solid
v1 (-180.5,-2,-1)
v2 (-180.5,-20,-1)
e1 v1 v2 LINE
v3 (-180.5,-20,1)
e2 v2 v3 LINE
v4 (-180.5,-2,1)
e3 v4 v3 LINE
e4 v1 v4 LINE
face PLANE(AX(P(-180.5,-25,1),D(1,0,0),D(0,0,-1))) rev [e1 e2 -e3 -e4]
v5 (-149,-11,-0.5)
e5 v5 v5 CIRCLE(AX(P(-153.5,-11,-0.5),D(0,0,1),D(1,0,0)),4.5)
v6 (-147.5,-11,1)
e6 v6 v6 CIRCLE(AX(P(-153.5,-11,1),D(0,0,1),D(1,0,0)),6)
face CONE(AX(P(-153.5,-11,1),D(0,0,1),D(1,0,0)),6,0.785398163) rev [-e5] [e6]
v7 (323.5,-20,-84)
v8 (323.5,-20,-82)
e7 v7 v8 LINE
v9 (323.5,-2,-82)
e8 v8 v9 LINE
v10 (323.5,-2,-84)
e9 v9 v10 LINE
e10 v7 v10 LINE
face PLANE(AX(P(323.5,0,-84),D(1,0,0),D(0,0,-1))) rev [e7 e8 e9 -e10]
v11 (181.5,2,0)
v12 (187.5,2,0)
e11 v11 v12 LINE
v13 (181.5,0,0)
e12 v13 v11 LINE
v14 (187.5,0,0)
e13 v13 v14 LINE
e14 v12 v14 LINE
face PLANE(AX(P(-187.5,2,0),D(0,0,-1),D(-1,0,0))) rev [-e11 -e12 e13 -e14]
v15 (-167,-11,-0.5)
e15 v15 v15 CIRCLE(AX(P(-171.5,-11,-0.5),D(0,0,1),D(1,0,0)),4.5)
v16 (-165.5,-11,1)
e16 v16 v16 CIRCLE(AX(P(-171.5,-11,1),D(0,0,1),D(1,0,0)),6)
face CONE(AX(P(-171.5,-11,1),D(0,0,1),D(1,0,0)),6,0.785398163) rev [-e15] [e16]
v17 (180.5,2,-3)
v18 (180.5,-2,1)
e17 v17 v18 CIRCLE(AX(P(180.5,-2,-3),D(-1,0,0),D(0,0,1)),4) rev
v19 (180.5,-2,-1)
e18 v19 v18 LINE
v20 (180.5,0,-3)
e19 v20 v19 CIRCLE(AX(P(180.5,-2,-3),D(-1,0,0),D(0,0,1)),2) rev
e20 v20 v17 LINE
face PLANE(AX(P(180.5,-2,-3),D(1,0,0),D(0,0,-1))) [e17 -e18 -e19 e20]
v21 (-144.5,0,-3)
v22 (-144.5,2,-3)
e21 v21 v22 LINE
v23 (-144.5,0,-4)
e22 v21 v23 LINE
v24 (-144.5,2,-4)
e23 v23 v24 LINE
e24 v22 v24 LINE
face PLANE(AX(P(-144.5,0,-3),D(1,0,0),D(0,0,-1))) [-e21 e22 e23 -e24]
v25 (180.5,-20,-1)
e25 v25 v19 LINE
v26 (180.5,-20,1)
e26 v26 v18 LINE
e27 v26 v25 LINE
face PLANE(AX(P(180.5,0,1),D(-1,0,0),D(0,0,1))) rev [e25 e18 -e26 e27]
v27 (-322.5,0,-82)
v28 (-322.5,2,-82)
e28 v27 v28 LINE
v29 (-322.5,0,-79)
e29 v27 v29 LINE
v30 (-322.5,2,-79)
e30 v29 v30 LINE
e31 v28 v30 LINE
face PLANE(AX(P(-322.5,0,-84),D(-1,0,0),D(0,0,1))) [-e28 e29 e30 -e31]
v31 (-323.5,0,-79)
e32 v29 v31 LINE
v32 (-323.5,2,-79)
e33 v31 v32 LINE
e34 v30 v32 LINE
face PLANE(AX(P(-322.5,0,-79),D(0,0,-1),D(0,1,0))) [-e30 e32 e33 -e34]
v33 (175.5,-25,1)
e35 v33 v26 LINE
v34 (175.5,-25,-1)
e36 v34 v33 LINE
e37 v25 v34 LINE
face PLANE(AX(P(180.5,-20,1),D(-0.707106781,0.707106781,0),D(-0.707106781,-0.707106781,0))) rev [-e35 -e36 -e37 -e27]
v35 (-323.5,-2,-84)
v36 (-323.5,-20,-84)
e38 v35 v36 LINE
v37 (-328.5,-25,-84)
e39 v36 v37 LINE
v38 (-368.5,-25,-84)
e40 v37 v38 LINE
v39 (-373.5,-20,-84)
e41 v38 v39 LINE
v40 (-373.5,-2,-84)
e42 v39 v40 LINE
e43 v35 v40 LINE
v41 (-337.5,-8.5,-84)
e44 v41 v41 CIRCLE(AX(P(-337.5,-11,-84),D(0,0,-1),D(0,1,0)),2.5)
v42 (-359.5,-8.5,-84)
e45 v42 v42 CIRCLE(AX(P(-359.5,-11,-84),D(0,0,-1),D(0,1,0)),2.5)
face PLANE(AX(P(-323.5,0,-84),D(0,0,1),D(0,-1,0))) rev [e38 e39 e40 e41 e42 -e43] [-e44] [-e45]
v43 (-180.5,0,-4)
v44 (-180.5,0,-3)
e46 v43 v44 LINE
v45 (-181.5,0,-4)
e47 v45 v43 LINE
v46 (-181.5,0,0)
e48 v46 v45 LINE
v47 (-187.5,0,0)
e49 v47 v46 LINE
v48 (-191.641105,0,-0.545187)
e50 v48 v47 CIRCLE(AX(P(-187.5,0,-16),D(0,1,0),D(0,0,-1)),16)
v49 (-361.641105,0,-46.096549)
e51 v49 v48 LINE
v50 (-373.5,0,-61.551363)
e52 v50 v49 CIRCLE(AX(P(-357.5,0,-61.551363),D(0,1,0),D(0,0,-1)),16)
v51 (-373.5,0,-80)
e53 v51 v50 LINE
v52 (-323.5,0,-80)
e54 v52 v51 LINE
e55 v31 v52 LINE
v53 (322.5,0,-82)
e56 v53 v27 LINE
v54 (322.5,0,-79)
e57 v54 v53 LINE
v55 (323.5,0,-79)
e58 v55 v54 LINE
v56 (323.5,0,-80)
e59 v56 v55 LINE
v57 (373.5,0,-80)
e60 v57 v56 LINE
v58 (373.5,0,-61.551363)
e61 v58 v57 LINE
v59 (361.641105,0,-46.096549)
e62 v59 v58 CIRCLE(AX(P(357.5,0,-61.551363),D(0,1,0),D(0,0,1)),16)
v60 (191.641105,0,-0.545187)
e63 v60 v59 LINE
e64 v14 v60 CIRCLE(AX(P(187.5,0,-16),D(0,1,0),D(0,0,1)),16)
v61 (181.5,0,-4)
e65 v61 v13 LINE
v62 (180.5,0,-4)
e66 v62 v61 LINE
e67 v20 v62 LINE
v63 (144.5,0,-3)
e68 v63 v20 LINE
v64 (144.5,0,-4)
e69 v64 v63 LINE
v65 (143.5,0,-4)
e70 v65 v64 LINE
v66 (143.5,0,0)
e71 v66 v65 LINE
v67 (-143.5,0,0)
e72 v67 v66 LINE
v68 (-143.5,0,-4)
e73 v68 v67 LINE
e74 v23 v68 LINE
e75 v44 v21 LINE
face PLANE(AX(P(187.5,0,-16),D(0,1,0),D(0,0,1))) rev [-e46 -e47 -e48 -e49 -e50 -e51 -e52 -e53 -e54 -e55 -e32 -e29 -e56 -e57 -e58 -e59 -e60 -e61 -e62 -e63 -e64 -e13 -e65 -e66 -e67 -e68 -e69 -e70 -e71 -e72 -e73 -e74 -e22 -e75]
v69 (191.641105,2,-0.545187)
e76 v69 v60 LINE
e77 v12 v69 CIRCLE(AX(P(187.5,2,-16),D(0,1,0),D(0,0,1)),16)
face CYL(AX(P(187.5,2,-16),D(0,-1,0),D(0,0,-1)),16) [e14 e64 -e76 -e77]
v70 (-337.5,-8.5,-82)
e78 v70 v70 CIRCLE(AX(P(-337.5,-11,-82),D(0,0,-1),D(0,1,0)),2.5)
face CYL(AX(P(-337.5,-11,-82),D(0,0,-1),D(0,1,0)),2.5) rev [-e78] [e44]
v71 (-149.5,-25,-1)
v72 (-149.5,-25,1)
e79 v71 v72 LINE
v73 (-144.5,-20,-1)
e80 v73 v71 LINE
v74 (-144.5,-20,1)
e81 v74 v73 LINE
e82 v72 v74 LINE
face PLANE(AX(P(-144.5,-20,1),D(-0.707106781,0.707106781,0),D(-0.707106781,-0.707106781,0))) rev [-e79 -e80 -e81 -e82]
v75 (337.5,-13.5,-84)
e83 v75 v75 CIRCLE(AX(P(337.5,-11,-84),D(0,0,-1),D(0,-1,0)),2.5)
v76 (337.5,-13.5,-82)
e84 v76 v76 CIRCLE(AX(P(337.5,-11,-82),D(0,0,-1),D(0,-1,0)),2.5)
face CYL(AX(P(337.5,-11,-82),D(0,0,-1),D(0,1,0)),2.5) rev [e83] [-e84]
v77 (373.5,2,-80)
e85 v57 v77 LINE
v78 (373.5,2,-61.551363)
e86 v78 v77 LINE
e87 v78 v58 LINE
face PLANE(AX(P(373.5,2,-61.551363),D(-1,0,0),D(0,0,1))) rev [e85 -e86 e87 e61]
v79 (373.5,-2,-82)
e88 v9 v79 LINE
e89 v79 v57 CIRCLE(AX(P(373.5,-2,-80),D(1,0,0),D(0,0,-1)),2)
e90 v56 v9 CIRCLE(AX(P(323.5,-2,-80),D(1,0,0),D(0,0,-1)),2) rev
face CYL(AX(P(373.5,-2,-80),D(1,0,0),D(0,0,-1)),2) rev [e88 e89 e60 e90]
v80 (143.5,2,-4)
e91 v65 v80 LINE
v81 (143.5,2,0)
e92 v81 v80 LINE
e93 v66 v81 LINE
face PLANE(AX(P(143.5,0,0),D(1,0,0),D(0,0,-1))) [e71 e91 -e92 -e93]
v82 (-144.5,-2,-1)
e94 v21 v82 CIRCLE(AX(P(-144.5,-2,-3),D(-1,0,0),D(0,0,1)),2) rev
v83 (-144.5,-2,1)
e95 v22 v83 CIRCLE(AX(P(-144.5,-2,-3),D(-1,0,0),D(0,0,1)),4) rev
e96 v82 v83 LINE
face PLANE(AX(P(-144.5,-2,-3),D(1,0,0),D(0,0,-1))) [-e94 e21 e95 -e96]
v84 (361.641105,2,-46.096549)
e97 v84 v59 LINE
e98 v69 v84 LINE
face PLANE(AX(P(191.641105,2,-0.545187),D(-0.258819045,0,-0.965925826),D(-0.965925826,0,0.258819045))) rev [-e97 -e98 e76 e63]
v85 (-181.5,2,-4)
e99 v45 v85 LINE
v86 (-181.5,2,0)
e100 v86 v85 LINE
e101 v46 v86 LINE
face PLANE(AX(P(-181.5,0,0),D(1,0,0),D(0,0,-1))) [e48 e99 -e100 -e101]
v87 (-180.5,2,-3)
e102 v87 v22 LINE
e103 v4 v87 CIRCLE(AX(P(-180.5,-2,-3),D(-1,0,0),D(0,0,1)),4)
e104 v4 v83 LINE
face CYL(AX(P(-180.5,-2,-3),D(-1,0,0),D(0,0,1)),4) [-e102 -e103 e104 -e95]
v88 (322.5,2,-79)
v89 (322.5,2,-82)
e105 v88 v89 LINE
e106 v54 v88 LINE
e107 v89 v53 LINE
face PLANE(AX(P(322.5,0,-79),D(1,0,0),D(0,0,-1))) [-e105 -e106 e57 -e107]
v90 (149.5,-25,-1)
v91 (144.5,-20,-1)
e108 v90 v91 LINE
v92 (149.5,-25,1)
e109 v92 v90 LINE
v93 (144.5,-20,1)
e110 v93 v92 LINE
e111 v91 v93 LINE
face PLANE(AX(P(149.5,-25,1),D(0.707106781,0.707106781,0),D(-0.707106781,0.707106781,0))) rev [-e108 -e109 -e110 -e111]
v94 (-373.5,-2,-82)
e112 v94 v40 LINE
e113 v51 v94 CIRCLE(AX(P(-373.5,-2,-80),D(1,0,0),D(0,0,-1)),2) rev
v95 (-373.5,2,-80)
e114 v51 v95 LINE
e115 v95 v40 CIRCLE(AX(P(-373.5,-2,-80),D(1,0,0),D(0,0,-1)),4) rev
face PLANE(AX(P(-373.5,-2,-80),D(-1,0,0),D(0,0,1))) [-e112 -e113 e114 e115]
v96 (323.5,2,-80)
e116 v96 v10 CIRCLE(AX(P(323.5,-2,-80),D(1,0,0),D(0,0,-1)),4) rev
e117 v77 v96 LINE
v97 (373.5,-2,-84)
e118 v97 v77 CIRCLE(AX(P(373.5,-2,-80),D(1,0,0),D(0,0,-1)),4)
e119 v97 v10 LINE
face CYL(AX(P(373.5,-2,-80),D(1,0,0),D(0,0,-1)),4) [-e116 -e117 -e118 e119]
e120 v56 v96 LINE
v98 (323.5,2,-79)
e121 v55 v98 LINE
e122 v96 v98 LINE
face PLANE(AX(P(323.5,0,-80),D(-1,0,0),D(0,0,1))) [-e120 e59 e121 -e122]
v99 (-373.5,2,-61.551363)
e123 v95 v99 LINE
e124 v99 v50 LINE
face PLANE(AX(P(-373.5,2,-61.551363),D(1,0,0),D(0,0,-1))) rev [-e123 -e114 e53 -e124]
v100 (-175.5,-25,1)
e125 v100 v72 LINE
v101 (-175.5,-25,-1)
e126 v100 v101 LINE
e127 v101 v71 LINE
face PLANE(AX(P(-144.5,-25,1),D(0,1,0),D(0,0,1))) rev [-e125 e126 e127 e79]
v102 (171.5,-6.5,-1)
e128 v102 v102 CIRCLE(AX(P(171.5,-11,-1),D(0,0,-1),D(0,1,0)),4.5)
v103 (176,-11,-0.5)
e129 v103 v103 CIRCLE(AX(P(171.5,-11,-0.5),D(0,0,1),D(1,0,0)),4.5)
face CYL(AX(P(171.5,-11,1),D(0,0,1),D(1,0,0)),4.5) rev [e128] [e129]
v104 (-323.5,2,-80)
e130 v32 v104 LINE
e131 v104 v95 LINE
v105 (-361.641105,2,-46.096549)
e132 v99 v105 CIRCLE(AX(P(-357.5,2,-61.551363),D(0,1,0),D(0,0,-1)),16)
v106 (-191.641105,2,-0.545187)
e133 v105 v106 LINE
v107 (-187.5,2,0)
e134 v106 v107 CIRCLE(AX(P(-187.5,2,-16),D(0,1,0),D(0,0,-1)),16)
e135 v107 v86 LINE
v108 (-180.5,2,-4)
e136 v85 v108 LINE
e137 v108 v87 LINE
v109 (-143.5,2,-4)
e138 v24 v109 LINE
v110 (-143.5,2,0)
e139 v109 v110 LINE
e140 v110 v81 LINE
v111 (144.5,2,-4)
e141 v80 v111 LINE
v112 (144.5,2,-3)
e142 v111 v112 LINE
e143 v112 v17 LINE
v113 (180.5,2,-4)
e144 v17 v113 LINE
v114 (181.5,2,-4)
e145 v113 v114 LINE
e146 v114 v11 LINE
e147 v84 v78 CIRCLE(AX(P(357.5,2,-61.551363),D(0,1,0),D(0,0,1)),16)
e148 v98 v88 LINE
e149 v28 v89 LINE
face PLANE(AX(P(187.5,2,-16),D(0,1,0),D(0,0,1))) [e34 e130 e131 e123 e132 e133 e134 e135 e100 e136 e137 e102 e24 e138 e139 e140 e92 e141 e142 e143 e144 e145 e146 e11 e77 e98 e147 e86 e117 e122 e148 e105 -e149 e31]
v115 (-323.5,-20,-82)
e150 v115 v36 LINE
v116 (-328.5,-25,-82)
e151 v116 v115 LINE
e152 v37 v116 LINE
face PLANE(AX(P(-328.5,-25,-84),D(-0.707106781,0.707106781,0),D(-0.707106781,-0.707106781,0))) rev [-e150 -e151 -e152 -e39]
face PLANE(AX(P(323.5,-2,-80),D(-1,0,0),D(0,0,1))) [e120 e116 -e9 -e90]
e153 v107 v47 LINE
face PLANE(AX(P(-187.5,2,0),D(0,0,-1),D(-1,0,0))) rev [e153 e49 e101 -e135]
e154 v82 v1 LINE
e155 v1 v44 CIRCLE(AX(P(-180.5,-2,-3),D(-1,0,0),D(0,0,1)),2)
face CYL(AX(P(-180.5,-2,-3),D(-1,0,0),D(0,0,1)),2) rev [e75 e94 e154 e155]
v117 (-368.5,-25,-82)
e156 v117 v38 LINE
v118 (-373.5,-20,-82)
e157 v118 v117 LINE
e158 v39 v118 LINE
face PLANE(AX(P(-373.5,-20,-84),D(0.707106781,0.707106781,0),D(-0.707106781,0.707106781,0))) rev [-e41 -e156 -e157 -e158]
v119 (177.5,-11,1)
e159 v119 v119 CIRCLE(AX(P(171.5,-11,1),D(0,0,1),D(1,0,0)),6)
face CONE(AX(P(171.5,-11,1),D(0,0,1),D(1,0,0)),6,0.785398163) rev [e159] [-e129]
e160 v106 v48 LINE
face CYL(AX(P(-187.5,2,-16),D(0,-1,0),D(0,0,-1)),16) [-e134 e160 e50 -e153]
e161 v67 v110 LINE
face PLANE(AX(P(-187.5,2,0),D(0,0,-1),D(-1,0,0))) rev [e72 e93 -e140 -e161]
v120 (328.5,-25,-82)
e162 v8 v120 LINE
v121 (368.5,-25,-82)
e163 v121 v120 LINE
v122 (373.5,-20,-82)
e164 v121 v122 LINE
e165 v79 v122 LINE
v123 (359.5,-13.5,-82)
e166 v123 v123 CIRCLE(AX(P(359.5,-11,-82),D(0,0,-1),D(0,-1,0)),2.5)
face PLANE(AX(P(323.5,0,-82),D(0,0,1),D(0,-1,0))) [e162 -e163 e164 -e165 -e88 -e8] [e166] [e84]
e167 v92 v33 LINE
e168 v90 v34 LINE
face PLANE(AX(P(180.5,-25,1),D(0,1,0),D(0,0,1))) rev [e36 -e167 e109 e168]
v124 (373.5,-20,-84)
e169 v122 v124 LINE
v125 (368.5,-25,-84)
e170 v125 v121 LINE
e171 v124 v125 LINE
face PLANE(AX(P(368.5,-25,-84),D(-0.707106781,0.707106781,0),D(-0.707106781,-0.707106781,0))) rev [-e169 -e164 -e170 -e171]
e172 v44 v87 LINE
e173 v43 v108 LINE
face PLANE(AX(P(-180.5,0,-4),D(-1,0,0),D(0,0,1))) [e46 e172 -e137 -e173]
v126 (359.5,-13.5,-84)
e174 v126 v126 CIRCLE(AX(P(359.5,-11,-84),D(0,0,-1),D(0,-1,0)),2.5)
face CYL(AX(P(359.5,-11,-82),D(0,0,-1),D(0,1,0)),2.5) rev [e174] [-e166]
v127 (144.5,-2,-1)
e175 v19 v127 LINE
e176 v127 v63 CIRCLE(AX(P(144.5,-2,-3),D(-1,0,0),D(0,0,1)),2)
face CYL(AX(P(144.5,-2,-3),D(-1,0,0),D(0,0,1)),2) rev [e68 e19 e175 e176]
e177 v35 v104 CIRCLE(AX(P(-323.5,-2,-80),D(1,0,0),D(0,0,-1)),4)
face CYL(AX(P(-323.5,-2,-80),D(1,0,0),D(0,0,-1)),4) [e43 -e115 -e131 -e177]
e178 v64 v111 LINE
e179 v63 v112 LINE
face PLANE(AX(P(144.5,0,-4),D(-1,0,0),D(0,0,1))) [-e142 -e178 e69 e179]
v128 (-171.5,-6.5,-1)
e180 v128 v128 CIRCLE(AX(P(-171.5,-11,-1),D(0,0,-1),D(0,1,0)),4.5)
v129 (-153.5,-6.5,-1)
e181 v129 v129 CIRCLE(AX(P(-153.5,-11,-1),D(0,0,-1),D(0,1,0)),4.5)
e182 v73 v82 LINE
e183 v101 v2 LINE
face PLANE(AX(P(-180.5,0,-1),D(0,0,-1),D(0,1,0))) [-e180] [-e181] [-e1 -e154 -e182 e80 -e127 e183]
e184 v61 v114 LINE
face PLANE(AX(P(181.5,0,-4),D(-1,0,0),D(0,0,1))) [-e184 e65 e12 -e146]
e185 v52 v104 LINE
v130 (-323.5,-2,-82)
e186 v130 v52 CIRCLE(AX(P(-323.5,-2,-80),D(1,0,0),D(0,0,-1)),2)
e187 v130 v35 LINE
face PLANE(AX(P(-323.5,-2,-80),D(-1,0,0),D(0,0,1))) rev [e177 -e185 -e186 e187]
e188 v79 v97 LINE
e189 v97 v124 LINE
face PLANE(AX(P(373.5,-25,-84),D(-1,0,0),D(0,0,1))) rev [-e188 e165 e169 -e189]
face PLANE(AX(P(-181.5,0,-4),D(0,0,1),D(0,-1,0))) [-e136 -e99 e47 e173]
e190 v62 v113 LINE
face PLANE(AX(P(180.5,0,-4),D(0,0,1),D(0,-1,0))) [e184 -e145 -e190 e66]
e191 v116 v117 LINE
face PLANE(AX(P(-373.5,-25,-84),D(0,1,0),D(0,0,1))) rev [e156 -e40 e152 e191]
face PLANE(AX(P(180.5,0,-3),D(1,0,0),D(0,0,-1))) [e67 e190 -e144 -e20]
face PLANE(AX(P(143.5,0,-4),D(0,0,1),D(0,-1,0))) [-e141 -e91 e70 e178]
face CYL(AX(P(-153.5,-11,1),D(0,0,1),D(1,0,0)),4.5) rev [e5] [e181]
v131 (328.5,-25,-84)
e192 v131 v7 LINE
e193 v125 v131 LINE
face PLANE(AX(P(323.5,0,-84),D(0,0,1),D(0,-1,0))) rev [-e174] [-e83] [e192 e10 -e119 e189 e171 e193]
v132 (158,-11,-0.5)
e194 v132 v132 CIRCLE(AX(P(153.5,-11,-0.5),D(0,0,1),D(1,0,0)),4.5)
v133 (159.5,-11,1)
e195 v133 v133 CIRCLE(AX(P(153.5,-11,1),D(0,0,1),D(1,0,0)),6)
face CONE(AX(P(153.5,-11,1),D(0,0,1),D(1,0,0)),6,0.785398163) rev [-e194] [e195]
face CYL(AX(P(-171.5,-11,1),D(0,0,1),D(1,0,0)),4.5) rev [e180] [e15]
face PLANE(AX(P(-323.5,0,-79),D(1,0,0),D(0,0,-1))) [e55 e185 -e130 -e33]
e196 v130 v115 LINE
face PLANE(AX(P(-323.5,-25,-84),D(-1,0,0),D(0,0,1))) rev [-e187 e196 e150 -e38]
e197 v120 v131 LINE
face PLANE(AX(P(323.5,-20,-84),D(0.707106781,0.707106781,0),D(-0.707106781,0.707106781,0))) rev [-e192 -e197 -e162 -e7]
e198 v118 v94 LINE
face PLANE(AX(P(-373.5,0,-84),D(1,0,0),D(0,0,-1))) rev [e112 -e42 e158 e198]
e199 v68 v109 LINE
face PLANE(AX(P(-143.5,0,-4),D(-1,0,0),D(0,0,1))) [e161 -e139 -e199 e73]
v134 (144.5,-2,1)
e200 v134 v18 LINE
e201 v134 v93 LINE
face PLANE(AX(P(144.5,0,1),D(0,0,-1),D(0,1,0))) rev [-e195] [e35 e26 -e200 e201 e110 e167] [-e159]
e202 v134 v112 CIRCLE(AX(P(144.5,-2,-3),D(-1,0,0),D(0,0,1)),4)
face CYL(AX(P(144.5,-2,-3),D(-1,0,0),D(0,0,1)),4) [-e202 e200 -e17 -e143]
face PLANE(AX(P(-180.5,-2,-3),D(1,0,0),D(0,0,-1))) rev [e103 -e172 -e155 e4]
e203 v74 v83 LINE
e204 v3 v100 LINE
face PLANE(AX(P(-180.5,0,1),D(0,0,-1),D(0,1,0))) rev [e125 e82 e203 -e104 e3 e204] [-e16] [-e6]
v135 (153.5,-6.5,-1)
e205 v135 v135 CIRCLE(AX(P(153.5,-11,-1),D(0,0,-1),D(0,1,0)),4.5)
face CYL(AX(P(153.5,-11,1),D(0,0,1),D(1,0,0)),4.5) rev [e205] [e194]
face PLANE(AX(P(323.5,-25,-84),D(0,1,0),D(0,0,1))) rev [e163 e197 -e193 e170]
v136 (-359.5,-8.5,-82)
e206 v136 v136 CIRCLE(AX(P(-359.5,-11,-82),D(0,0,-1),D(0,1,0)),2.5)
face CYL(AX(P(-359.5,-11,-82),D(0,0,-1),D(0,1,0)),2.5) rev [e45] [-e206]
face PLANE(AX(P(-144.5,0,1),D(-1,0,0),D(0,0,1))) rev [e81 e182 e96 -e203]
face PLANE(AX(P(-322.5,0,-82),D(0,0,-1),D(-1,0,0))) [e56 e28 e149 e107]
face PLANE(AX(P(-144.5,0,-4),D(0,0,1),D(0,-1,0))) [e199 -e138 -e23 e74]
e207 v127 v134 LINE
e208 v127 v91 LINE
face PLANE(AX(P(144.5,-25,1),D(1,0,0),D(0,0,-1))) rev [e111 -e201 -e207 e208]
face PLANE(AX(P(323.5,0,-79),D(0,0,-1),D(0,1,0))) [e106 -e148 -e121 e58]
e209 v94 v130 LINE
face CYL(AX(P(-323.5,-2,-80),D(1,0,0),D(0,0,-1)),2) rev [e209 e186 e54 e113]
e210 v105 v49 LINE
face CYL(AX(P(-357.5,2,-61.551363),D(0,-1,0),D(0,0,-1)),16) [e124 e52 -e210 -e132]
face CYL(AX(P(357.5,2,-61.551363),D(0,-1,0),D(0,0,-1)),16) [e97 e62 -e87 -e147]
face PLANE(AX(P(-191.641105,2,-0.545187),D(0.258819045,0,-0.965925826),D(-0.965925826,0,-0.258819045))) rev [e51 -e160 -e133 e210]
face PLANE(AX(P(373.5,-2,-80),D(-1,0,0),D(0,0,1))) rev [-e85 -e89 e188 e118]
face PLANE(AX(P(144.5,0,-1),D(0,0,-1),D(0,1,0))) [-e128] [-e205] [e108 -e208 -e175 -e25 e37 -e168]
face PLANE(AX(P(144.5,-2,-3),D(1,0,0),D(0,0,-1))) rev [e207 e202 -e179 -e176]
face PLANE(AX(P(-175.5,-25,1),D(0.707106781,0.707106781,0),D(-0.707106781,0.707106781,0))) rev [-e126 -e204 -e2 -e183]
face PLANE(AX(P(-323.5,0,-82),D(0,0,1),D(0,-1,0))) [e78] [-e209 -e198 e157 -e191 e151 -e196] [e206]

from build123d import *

# Parameters (mm, degrees)
SM_BASE_FLANGE_1_DEPTH            = 2
SM_EDGE_FLANGE_1_STRIP_W          = 12
SM_EDGE_FLANGE_1_STRIP_H          = 2
SM_EDGE_FLANGE_1_STRIP_CUT_DEPTH  = 50
SM_EDGE_FLANGE_1_RELIEF_W         = 13
SM_EDGE_FLANGE_1_RELIEF_H         = 1
SM_EDGE_FLANGE_1_RELIEF_CUT_DEPTH = 2
SM_EDGE_FLANGE_1_DEPTH            = 50
SM_EDGE_FLANGE_2_STRIP_W          = 12
SM_EDGE_FLANGE_2_STRIP_H          = 2
SM_EDGE_FLANGE_2_STRIP_CUT_DEPTH  = 50
SM_EDGE_FLANGE_2_RELIEF_W         = 13
SM_EDGE_FLANGE_2_RELIEF_H         = 1
SM_EDGE_FLANGE_2_RELIEF_CUT_DEPTH = 2
SM_EDGE_FLANGE_2_DEPTH            = 50
SM_EDGE_FLANGE_3_STRIP_W          = 13
SM_EDGE_FLANGE_3_STRIP_H          = 2
SM_EDGE_FLANGE_3_STRIP_CUT_DEPTH  = 36
SM_EDGE_FLANGE_3_RELIEF_W         = 14
SM_EDGE_FLANGE_3_RELIEF_H         = 1
SM_EDGE_FLANGE_3_RELIEF_CUT_DEPTH = 2
SM_EDGE_FLANGE_3_DEPTH            = 36
SM_EDGE_FLANGE_4_STRIP_W          = 13
SM_EDGE_FLANGE_4_STRIP_H          = 2
SM_EDGE_FLANGE_4_STRIP_CUT_DEPTH  = 36
SM_EDGE_FLANGE_4_RELIEF_W         = 14
SM_EDGE_FLANGE_4_RELIEF_H         = 1
SM_EDGE_FLANGE_4_RELIEF_CUT_DEPTH = 2
SM_EDGE_FLANGE_4_DEPTH            = 36
CHAMFER_1_SIZE                    = 5
HOLE_WIZARD_M61_AT_2_COUNT        = 2
HOLE_WIZARD_M61_AT_2_PITCH        = 18
HOLE_WIZARD_M61_AT_3_COUNT        = 2
HOLE_WIZARD_M61_AT_3_PITCH        = 325
HOLE_WIZARD_M61_AT_4_COUNT        = 2
HOLE_WIZARD_M61_AT_4_PITCH        = 343
SKETCH_20_R                       = 2.5
CUT_EXTRUDE_1_DEPTH               = 2
SKETCH_21_W                       = 645
SKETCH_21_H                       = 2
CUT_EXTRUDE_2_DEPTH               = 2


# Sheet-metal steps are written as plain solids
with BuildPart() as part:
    # Sketch 1 → Базовая кромка1 (new body)
    with BuildSketch(Plane(origin=(0, 0, 0), x_dir=(1, 0, 0), z_dir=(0, 1, 0))):
        with BuildLine():
            Line((-187.5, 0), (187.5, 0))
            ThreePointArc((187.5, 0), (189.588419076, 0.136882218), (191.641104722, 0.545186779))
            Line((191.641104722, 0.545186779), (361.641104722, 46.096549493))
            ThreePointArc((361.641104722, 46.096549493), (370.193653445, 51.811179849), (373.5, 61.551362713))
            Line((373.5, 61.551362713), (373.5, 84))
            Line((373.5, 84), (0, 84))
            Line((0, 84), (-373.5, 84))
            Line((-373.5, 84), (-373.5, 61.551362713))
            ThreePointArc((-373.5, 61.551362713), (-370.193653445, 51.811179849), (-361.641104722, 46.096549493))
            Line((-361.641104722, 46.096549493), (-191.641104722, 0.545186779))
            ThreePointArc((-191.641104722, 0.545186779), (-189.588419076, 0.136882218), (-187.5, 0))
        make_face()
    extrude(amount=SM_BASE_FLANGE_1_DEPTH)

    # Ребро-кромка1 strip (across the edge) → Ребро-кромка1 strip cut (cut)
    with BuildSketch(Plane(origin=(323.5, 0, -84), x_dir=(0, 0, 1), z_dir=(1, 0, 0))):
        with Locations((-2, -1)):
            Rectangle(SM_EDGE_FLANGE_1_STRIP_W, SM_EDGE_FLANGE_1_STRIP_H)
    extrude(amount=SM_EDGE_FLANGE_1_STRIP_CUT_DEPTH, mode=Mode.SUBTRACT)

    # Ребро-кромка1 relief (on the sheet) → Ребро-кромка1 relief cut (cut)
    with BuildSketch(Plane(origin=(323.5, 0, -80), x_dir=(0, 0, 1), z_dir=(0, -1, 0))):
        with Locations((-5.5, 0.5)):
            Rectangle(SM_EDGE_FLANGE_1_RELIEF_W, SM_EDGE_FLANGE_1_RELIEF_H)
    extrude(amount=-SM_EDGE_FLANGE_1_RELIEF_CUT_DEPTH, mode=Mode.SUBTRACT)

    # Ребро-кромка1 section (across the edge) → Ребро-кромка1 (add)
    with BuildSketch(Plane(origin=(323.5, 0, -84), x_dir=(0, 0, 1), z_dir=(1, 0, 0))):
        with BuildLine():
            Line((0, 2), (0, 25))
            Line((0, 25), (2, 25))
            Line((2, 25), (2, 2))
            ThreePointArc((2, 2), (2.585786438, 0.585786438), (4, 0))
            Line((4, 0), (4, -2))
            ThreePointArc((4, -2), (1.171572875, -0.828427125), (0, 2))
        make_face()
    extrude(amount=SM_EDGE_FLANGE_1_DEPTH)

    # Ребро-кромка2 strip (across the edge) → Ребро-кромка2 strip cut (cut)
    with BuildSketch(Plane(origin=(-373.5, 0, -84), x_dir=(0, 0, 1), z_dir=(1, 0, 0))):
        with Locations((-2, -1)):
            Rectangle(SM_EDGE_FLANGE_2_STRIP_W, SM_EDGE_FLANGE_2_STRIP_H)
    extrude(amount=SM_EDGE_FLANGE_2_STRIP_CUT_DEPTH, mode=Mode.SUBTRACT)

    # Ребро-кромка2 relief (on the sheet) → Ребро-кромка2 relief cut (cut)
    with BuildSketch(Plane(origin=(-373.5, 0, -80), x_dir=(0, 0, 1), z_dir=(0, -1, 0))):
        with Locations((-5.5, -50.5)):
            Rectangle(SM_EDGE_FLANGE_2_RELIEF_W, SM_EDGE_FLANGE_2_RELIEF_H)
    extrude(amount=-SM_EDGE_FLANGE_2_RELIEF_CUT_DEPTH, mode=Mode.SUBTRACT)

    # Ребро-кромка2 section (across the edge) → Ребро-кромка2 (add)
    with BuildSketch(Plane(origin=(-373.5, 0, -84), x_dir=(0, 0, 1), z_dir=(1, 0, 0))):
        with BuildLine():
            Line((0, 2), (0, 25))
            Line((0, 25), (2, 25))
            Line((2, 25), (2, 2))
            ThreePointArc((2, 2), (2.585786438, 0.585786438), (4, 0))
            Line((4, 0), (4, -2))
            ThreePointArc((4, -2), (1.171572875, -0.828427125), (0, 2))
        make_face()
    extrude(amount=SM_EDGE_FLANGE_2_DEPTH)

    # Ребро-кромка3 strip (across the edge) → Ребро-кромка3 strip cut (cut)
    with BuildSketch(Plane(origin=(-144.5, 0, 1), x_dir=(0, 0, -1), z_dir=(-1, 0, 0))):
        with Locations((-2.5, -1)):
            Rectangle(SM_EDGE_FLANGE_3_STRIP_W, SM_EDGE_FLANGE_3_STRIP_H)
    extrude(amount=SM_EDGE_FLANGE_3_STRIP_CUT_DEPTH, mode=Mode.SUBTRACT)

    # Ребро-кромка3 relief (on the sheet) → Ребро-кромка3 relief cut (cut)
    with BuildSketch(Plane(origin=(-144.5, 0, -3), x_dir=(0, 0, -1), z_dir=(0, -1, 0))):
        with Locations((-6, 0.5)):
            Rectangle(SM_EDGE_FLANGE_3_RELIEF_W, SM_EDGE_FLANGE_3_RELIEF_H)
        with Locations((-6, -36.5)):
            Rectangle(SM_EDGE_FLANGE_3_RELIEF_W, SM_EDGE_FLANGE_3_RELIEF_H)
    extrude(amount=-SM_EDGE_FLANGE_3_RELIEF_CUT_DEPTH, mode=Mode.SUBTRACT)

    # Ребро-кромка3 section (across the edge) → Ребро-кромка3 (add)
    with BuildSketch(Plane(origin=(-144.5, 0, 1), x_dir=(0, 0, -1), z_dir=(-1, 0, 0))):
        with BuildLine():
            Line((0, 2), (0, 25))
            Line((0, 25), (2, 25))
            Line((2, 25), (2, 2))
            ThreePointArc((2, 2), (2.585786438, 0.585786438), (4, 0))
            Line((4, 0), (4, -2))
            ThreePointArc((4, -2), (1.171572875, -0.828427125), (0, 2))
        make_face()
    extrude(amount=SM_EDGE_FLANGE_3_DEPTH)

    # Ребро-кромка4 strip (across the edge) → Ребро-кромка4 strip cut (cut)
    with BuildSketch(Plane(origin=(180.5, 0, 1), x_dir=(0, 0, -1), z_dir=(-1, 0, 0))):
        with Locations((-2.5, -1)):
            Rectangle(SM_EDGE_FLANGE_4_STRIP_W, SM_EDGE_FLANGE_4_STRIP_H)
    extrude(amount=SM_EDGE_FLANGE_4_STRIP_CUT_DEPTH, mode=Mode.SUBTRACT)

    # Ребро-кромка4 relief (on the sheet) → Ребро-кромка4 relief cut (cut)
    with BuildSketch(Plane(origin=(180.5, 0, -3), x_dir=(0, 0, -1), z_dir=(0, -1, 0))):
        with Locations((-6, 0.5)):
            Rectangle(SM_EDGE_FLANGE_4_RELIEF_W, SM_EDGE_FLANGE_4_RELIEF_H)
        with Locations((-6, -36.5)):
            Rectangle(SM_EDGE_FLANGE_4_RELIEF_W, SM_EDGE_FLANGE_4_RELIEF_H)
    extrude(amount=-SM_EDGE_FLANGE_4_RELIEF_CUT_DEPTH, mode=Mode.SUBTRACT)

    # Ребро-кромка4 section (across the edge) → Ребро-кромка4 (add)
    with BuildSketch(Plane(origin=(180.5, 0, 1), x_dir=(0, 0, -1), z_dir=(-1, 0, 0))):
        with BuildLine():
            Line((0, 2), (0, 25))
            Line((0, 25), (2, 25))
            Line((2, 25), (2, 2))
            ThreePointArc((2, 2), (2.585786438, 0.585786438), (4, 0))
            Line((4, 0), (4, -2))
            ThreePointArc((4, -2), (1.171572875, -0.828427125), (0, 2))
        make_face()
    extrude(amount=SM_EDGE_FLANGE_4_DEPTH)

    # Фаска1
    chamfer_1_edges = [part.edges().sort_by_distance(p)[0] for p in [
        (-373.5, -25, -83),
        (-323.5, -25, -83),
        (-144.5, -25, 0),
        (-180.5, -25, 0),
        (180.5, -25, 0),
        (144.5, -25, 0),
        (323.5, -25, -83),
        (373.5, -25, -83),
    ]]
    chamfer(chamfer_1_edges, length=CHAMFER_1_SIZE)

    # Эскиз18 → Зенковка для винта с потайной головкой M61 (revolve, cut)
    with BuildSketch(Plane(origin=(-171.5, -11, 1), x_dir=(0, -1, 0), z_dir=(1, 0, 0))):
        Polygon((0, 0), (0, 2), (4.5, 2), (4.5, 1.5), (6, 0), align=None)
    hole_wizard_m61 = revolve(axis=Axis((-171.5, -11, 7.35), (0, 0, -1)), mode=Mode.SUBTRACT)

    # Зенковка для винта с потайной головкой M61 at 2: Зенковка для винта с потайной головкой M61 ×2
    with Locations(*[(i * HOLE_WIZARD_M61_AT_2_PITCH, 0, 0) for i in range(1, HOLE_WIZARD_M61_AT_2_COUNT)]):
        add(hole_wizard_m61, mode=Mode.SUBTRACT)

    # Зенковка для винта с потайной головкой M61 at 3: Зенковка для винта с потайной головкой M61 ×2
    with Locations(*[(i * HOLE_WIZARD_M61_AT_3_PITCH, 0, 0) for i in range(1, HOLE_WIZARD_M61_AT_3_COUNT)]):
        add(hole_wizard_m61, mode=Mode.SUBTRACT)

    # Зенковка для винта с потайной головкой M61 at 4: Зенковка для винта с потайной головкой M61 ×2
    with Locations(*[(i * HOLE_WIZARD_M61_AT_4_PITCH, 0, 0) for i in range(1, HOLE_WIZARD_M61_AT_4_COUNT)]):
        add(hole_wizard_m61, mode=Mode.SUBTRACT)

    # Эскиз20 → Вытянуть1 (cut)
    with BuildSketch(Plane(origin=(0, 0, -84), x_dir=(-1, 0, 0), z_dir=(0, 0, -1))):
        with Locations(Location((337.5, -11, 0), (0, 0, 90))):
            Circle(SKETCH_20_R)
        with Locations(Location((359.5, -11, 0), (0, 0, 90))):
            Circle(SKETCH_20_R)
        with Locations(Location((-359.5, -11, 0), (0, 0, 270))):
            Circle(SKETCH_20_R)
        with Locations(Location((-337.5, -11, 0), (0, 0, 270))):
            Circle(SKETCH_20_R)
    extrude(amount=-CUT_EXTRUDE_1_DEPTH, mode=Mode.SUBTRACT)

    # Эскиз21 → Вытянуть2 (cut)
    with BuildSketch(Plane(origin=(0, 0, -84), x_dir=(-1, 0, 0), z_dir=(0, 0, -1))):
        with Locations((0, 1)):
            Rectangle(SKETCH_21_W, SKETCH_21_H)
    extrude(amount=-CUT_EXTRUDE_2_DEPTH, mode=Mode.SUBTRACT)


solid = part.part
